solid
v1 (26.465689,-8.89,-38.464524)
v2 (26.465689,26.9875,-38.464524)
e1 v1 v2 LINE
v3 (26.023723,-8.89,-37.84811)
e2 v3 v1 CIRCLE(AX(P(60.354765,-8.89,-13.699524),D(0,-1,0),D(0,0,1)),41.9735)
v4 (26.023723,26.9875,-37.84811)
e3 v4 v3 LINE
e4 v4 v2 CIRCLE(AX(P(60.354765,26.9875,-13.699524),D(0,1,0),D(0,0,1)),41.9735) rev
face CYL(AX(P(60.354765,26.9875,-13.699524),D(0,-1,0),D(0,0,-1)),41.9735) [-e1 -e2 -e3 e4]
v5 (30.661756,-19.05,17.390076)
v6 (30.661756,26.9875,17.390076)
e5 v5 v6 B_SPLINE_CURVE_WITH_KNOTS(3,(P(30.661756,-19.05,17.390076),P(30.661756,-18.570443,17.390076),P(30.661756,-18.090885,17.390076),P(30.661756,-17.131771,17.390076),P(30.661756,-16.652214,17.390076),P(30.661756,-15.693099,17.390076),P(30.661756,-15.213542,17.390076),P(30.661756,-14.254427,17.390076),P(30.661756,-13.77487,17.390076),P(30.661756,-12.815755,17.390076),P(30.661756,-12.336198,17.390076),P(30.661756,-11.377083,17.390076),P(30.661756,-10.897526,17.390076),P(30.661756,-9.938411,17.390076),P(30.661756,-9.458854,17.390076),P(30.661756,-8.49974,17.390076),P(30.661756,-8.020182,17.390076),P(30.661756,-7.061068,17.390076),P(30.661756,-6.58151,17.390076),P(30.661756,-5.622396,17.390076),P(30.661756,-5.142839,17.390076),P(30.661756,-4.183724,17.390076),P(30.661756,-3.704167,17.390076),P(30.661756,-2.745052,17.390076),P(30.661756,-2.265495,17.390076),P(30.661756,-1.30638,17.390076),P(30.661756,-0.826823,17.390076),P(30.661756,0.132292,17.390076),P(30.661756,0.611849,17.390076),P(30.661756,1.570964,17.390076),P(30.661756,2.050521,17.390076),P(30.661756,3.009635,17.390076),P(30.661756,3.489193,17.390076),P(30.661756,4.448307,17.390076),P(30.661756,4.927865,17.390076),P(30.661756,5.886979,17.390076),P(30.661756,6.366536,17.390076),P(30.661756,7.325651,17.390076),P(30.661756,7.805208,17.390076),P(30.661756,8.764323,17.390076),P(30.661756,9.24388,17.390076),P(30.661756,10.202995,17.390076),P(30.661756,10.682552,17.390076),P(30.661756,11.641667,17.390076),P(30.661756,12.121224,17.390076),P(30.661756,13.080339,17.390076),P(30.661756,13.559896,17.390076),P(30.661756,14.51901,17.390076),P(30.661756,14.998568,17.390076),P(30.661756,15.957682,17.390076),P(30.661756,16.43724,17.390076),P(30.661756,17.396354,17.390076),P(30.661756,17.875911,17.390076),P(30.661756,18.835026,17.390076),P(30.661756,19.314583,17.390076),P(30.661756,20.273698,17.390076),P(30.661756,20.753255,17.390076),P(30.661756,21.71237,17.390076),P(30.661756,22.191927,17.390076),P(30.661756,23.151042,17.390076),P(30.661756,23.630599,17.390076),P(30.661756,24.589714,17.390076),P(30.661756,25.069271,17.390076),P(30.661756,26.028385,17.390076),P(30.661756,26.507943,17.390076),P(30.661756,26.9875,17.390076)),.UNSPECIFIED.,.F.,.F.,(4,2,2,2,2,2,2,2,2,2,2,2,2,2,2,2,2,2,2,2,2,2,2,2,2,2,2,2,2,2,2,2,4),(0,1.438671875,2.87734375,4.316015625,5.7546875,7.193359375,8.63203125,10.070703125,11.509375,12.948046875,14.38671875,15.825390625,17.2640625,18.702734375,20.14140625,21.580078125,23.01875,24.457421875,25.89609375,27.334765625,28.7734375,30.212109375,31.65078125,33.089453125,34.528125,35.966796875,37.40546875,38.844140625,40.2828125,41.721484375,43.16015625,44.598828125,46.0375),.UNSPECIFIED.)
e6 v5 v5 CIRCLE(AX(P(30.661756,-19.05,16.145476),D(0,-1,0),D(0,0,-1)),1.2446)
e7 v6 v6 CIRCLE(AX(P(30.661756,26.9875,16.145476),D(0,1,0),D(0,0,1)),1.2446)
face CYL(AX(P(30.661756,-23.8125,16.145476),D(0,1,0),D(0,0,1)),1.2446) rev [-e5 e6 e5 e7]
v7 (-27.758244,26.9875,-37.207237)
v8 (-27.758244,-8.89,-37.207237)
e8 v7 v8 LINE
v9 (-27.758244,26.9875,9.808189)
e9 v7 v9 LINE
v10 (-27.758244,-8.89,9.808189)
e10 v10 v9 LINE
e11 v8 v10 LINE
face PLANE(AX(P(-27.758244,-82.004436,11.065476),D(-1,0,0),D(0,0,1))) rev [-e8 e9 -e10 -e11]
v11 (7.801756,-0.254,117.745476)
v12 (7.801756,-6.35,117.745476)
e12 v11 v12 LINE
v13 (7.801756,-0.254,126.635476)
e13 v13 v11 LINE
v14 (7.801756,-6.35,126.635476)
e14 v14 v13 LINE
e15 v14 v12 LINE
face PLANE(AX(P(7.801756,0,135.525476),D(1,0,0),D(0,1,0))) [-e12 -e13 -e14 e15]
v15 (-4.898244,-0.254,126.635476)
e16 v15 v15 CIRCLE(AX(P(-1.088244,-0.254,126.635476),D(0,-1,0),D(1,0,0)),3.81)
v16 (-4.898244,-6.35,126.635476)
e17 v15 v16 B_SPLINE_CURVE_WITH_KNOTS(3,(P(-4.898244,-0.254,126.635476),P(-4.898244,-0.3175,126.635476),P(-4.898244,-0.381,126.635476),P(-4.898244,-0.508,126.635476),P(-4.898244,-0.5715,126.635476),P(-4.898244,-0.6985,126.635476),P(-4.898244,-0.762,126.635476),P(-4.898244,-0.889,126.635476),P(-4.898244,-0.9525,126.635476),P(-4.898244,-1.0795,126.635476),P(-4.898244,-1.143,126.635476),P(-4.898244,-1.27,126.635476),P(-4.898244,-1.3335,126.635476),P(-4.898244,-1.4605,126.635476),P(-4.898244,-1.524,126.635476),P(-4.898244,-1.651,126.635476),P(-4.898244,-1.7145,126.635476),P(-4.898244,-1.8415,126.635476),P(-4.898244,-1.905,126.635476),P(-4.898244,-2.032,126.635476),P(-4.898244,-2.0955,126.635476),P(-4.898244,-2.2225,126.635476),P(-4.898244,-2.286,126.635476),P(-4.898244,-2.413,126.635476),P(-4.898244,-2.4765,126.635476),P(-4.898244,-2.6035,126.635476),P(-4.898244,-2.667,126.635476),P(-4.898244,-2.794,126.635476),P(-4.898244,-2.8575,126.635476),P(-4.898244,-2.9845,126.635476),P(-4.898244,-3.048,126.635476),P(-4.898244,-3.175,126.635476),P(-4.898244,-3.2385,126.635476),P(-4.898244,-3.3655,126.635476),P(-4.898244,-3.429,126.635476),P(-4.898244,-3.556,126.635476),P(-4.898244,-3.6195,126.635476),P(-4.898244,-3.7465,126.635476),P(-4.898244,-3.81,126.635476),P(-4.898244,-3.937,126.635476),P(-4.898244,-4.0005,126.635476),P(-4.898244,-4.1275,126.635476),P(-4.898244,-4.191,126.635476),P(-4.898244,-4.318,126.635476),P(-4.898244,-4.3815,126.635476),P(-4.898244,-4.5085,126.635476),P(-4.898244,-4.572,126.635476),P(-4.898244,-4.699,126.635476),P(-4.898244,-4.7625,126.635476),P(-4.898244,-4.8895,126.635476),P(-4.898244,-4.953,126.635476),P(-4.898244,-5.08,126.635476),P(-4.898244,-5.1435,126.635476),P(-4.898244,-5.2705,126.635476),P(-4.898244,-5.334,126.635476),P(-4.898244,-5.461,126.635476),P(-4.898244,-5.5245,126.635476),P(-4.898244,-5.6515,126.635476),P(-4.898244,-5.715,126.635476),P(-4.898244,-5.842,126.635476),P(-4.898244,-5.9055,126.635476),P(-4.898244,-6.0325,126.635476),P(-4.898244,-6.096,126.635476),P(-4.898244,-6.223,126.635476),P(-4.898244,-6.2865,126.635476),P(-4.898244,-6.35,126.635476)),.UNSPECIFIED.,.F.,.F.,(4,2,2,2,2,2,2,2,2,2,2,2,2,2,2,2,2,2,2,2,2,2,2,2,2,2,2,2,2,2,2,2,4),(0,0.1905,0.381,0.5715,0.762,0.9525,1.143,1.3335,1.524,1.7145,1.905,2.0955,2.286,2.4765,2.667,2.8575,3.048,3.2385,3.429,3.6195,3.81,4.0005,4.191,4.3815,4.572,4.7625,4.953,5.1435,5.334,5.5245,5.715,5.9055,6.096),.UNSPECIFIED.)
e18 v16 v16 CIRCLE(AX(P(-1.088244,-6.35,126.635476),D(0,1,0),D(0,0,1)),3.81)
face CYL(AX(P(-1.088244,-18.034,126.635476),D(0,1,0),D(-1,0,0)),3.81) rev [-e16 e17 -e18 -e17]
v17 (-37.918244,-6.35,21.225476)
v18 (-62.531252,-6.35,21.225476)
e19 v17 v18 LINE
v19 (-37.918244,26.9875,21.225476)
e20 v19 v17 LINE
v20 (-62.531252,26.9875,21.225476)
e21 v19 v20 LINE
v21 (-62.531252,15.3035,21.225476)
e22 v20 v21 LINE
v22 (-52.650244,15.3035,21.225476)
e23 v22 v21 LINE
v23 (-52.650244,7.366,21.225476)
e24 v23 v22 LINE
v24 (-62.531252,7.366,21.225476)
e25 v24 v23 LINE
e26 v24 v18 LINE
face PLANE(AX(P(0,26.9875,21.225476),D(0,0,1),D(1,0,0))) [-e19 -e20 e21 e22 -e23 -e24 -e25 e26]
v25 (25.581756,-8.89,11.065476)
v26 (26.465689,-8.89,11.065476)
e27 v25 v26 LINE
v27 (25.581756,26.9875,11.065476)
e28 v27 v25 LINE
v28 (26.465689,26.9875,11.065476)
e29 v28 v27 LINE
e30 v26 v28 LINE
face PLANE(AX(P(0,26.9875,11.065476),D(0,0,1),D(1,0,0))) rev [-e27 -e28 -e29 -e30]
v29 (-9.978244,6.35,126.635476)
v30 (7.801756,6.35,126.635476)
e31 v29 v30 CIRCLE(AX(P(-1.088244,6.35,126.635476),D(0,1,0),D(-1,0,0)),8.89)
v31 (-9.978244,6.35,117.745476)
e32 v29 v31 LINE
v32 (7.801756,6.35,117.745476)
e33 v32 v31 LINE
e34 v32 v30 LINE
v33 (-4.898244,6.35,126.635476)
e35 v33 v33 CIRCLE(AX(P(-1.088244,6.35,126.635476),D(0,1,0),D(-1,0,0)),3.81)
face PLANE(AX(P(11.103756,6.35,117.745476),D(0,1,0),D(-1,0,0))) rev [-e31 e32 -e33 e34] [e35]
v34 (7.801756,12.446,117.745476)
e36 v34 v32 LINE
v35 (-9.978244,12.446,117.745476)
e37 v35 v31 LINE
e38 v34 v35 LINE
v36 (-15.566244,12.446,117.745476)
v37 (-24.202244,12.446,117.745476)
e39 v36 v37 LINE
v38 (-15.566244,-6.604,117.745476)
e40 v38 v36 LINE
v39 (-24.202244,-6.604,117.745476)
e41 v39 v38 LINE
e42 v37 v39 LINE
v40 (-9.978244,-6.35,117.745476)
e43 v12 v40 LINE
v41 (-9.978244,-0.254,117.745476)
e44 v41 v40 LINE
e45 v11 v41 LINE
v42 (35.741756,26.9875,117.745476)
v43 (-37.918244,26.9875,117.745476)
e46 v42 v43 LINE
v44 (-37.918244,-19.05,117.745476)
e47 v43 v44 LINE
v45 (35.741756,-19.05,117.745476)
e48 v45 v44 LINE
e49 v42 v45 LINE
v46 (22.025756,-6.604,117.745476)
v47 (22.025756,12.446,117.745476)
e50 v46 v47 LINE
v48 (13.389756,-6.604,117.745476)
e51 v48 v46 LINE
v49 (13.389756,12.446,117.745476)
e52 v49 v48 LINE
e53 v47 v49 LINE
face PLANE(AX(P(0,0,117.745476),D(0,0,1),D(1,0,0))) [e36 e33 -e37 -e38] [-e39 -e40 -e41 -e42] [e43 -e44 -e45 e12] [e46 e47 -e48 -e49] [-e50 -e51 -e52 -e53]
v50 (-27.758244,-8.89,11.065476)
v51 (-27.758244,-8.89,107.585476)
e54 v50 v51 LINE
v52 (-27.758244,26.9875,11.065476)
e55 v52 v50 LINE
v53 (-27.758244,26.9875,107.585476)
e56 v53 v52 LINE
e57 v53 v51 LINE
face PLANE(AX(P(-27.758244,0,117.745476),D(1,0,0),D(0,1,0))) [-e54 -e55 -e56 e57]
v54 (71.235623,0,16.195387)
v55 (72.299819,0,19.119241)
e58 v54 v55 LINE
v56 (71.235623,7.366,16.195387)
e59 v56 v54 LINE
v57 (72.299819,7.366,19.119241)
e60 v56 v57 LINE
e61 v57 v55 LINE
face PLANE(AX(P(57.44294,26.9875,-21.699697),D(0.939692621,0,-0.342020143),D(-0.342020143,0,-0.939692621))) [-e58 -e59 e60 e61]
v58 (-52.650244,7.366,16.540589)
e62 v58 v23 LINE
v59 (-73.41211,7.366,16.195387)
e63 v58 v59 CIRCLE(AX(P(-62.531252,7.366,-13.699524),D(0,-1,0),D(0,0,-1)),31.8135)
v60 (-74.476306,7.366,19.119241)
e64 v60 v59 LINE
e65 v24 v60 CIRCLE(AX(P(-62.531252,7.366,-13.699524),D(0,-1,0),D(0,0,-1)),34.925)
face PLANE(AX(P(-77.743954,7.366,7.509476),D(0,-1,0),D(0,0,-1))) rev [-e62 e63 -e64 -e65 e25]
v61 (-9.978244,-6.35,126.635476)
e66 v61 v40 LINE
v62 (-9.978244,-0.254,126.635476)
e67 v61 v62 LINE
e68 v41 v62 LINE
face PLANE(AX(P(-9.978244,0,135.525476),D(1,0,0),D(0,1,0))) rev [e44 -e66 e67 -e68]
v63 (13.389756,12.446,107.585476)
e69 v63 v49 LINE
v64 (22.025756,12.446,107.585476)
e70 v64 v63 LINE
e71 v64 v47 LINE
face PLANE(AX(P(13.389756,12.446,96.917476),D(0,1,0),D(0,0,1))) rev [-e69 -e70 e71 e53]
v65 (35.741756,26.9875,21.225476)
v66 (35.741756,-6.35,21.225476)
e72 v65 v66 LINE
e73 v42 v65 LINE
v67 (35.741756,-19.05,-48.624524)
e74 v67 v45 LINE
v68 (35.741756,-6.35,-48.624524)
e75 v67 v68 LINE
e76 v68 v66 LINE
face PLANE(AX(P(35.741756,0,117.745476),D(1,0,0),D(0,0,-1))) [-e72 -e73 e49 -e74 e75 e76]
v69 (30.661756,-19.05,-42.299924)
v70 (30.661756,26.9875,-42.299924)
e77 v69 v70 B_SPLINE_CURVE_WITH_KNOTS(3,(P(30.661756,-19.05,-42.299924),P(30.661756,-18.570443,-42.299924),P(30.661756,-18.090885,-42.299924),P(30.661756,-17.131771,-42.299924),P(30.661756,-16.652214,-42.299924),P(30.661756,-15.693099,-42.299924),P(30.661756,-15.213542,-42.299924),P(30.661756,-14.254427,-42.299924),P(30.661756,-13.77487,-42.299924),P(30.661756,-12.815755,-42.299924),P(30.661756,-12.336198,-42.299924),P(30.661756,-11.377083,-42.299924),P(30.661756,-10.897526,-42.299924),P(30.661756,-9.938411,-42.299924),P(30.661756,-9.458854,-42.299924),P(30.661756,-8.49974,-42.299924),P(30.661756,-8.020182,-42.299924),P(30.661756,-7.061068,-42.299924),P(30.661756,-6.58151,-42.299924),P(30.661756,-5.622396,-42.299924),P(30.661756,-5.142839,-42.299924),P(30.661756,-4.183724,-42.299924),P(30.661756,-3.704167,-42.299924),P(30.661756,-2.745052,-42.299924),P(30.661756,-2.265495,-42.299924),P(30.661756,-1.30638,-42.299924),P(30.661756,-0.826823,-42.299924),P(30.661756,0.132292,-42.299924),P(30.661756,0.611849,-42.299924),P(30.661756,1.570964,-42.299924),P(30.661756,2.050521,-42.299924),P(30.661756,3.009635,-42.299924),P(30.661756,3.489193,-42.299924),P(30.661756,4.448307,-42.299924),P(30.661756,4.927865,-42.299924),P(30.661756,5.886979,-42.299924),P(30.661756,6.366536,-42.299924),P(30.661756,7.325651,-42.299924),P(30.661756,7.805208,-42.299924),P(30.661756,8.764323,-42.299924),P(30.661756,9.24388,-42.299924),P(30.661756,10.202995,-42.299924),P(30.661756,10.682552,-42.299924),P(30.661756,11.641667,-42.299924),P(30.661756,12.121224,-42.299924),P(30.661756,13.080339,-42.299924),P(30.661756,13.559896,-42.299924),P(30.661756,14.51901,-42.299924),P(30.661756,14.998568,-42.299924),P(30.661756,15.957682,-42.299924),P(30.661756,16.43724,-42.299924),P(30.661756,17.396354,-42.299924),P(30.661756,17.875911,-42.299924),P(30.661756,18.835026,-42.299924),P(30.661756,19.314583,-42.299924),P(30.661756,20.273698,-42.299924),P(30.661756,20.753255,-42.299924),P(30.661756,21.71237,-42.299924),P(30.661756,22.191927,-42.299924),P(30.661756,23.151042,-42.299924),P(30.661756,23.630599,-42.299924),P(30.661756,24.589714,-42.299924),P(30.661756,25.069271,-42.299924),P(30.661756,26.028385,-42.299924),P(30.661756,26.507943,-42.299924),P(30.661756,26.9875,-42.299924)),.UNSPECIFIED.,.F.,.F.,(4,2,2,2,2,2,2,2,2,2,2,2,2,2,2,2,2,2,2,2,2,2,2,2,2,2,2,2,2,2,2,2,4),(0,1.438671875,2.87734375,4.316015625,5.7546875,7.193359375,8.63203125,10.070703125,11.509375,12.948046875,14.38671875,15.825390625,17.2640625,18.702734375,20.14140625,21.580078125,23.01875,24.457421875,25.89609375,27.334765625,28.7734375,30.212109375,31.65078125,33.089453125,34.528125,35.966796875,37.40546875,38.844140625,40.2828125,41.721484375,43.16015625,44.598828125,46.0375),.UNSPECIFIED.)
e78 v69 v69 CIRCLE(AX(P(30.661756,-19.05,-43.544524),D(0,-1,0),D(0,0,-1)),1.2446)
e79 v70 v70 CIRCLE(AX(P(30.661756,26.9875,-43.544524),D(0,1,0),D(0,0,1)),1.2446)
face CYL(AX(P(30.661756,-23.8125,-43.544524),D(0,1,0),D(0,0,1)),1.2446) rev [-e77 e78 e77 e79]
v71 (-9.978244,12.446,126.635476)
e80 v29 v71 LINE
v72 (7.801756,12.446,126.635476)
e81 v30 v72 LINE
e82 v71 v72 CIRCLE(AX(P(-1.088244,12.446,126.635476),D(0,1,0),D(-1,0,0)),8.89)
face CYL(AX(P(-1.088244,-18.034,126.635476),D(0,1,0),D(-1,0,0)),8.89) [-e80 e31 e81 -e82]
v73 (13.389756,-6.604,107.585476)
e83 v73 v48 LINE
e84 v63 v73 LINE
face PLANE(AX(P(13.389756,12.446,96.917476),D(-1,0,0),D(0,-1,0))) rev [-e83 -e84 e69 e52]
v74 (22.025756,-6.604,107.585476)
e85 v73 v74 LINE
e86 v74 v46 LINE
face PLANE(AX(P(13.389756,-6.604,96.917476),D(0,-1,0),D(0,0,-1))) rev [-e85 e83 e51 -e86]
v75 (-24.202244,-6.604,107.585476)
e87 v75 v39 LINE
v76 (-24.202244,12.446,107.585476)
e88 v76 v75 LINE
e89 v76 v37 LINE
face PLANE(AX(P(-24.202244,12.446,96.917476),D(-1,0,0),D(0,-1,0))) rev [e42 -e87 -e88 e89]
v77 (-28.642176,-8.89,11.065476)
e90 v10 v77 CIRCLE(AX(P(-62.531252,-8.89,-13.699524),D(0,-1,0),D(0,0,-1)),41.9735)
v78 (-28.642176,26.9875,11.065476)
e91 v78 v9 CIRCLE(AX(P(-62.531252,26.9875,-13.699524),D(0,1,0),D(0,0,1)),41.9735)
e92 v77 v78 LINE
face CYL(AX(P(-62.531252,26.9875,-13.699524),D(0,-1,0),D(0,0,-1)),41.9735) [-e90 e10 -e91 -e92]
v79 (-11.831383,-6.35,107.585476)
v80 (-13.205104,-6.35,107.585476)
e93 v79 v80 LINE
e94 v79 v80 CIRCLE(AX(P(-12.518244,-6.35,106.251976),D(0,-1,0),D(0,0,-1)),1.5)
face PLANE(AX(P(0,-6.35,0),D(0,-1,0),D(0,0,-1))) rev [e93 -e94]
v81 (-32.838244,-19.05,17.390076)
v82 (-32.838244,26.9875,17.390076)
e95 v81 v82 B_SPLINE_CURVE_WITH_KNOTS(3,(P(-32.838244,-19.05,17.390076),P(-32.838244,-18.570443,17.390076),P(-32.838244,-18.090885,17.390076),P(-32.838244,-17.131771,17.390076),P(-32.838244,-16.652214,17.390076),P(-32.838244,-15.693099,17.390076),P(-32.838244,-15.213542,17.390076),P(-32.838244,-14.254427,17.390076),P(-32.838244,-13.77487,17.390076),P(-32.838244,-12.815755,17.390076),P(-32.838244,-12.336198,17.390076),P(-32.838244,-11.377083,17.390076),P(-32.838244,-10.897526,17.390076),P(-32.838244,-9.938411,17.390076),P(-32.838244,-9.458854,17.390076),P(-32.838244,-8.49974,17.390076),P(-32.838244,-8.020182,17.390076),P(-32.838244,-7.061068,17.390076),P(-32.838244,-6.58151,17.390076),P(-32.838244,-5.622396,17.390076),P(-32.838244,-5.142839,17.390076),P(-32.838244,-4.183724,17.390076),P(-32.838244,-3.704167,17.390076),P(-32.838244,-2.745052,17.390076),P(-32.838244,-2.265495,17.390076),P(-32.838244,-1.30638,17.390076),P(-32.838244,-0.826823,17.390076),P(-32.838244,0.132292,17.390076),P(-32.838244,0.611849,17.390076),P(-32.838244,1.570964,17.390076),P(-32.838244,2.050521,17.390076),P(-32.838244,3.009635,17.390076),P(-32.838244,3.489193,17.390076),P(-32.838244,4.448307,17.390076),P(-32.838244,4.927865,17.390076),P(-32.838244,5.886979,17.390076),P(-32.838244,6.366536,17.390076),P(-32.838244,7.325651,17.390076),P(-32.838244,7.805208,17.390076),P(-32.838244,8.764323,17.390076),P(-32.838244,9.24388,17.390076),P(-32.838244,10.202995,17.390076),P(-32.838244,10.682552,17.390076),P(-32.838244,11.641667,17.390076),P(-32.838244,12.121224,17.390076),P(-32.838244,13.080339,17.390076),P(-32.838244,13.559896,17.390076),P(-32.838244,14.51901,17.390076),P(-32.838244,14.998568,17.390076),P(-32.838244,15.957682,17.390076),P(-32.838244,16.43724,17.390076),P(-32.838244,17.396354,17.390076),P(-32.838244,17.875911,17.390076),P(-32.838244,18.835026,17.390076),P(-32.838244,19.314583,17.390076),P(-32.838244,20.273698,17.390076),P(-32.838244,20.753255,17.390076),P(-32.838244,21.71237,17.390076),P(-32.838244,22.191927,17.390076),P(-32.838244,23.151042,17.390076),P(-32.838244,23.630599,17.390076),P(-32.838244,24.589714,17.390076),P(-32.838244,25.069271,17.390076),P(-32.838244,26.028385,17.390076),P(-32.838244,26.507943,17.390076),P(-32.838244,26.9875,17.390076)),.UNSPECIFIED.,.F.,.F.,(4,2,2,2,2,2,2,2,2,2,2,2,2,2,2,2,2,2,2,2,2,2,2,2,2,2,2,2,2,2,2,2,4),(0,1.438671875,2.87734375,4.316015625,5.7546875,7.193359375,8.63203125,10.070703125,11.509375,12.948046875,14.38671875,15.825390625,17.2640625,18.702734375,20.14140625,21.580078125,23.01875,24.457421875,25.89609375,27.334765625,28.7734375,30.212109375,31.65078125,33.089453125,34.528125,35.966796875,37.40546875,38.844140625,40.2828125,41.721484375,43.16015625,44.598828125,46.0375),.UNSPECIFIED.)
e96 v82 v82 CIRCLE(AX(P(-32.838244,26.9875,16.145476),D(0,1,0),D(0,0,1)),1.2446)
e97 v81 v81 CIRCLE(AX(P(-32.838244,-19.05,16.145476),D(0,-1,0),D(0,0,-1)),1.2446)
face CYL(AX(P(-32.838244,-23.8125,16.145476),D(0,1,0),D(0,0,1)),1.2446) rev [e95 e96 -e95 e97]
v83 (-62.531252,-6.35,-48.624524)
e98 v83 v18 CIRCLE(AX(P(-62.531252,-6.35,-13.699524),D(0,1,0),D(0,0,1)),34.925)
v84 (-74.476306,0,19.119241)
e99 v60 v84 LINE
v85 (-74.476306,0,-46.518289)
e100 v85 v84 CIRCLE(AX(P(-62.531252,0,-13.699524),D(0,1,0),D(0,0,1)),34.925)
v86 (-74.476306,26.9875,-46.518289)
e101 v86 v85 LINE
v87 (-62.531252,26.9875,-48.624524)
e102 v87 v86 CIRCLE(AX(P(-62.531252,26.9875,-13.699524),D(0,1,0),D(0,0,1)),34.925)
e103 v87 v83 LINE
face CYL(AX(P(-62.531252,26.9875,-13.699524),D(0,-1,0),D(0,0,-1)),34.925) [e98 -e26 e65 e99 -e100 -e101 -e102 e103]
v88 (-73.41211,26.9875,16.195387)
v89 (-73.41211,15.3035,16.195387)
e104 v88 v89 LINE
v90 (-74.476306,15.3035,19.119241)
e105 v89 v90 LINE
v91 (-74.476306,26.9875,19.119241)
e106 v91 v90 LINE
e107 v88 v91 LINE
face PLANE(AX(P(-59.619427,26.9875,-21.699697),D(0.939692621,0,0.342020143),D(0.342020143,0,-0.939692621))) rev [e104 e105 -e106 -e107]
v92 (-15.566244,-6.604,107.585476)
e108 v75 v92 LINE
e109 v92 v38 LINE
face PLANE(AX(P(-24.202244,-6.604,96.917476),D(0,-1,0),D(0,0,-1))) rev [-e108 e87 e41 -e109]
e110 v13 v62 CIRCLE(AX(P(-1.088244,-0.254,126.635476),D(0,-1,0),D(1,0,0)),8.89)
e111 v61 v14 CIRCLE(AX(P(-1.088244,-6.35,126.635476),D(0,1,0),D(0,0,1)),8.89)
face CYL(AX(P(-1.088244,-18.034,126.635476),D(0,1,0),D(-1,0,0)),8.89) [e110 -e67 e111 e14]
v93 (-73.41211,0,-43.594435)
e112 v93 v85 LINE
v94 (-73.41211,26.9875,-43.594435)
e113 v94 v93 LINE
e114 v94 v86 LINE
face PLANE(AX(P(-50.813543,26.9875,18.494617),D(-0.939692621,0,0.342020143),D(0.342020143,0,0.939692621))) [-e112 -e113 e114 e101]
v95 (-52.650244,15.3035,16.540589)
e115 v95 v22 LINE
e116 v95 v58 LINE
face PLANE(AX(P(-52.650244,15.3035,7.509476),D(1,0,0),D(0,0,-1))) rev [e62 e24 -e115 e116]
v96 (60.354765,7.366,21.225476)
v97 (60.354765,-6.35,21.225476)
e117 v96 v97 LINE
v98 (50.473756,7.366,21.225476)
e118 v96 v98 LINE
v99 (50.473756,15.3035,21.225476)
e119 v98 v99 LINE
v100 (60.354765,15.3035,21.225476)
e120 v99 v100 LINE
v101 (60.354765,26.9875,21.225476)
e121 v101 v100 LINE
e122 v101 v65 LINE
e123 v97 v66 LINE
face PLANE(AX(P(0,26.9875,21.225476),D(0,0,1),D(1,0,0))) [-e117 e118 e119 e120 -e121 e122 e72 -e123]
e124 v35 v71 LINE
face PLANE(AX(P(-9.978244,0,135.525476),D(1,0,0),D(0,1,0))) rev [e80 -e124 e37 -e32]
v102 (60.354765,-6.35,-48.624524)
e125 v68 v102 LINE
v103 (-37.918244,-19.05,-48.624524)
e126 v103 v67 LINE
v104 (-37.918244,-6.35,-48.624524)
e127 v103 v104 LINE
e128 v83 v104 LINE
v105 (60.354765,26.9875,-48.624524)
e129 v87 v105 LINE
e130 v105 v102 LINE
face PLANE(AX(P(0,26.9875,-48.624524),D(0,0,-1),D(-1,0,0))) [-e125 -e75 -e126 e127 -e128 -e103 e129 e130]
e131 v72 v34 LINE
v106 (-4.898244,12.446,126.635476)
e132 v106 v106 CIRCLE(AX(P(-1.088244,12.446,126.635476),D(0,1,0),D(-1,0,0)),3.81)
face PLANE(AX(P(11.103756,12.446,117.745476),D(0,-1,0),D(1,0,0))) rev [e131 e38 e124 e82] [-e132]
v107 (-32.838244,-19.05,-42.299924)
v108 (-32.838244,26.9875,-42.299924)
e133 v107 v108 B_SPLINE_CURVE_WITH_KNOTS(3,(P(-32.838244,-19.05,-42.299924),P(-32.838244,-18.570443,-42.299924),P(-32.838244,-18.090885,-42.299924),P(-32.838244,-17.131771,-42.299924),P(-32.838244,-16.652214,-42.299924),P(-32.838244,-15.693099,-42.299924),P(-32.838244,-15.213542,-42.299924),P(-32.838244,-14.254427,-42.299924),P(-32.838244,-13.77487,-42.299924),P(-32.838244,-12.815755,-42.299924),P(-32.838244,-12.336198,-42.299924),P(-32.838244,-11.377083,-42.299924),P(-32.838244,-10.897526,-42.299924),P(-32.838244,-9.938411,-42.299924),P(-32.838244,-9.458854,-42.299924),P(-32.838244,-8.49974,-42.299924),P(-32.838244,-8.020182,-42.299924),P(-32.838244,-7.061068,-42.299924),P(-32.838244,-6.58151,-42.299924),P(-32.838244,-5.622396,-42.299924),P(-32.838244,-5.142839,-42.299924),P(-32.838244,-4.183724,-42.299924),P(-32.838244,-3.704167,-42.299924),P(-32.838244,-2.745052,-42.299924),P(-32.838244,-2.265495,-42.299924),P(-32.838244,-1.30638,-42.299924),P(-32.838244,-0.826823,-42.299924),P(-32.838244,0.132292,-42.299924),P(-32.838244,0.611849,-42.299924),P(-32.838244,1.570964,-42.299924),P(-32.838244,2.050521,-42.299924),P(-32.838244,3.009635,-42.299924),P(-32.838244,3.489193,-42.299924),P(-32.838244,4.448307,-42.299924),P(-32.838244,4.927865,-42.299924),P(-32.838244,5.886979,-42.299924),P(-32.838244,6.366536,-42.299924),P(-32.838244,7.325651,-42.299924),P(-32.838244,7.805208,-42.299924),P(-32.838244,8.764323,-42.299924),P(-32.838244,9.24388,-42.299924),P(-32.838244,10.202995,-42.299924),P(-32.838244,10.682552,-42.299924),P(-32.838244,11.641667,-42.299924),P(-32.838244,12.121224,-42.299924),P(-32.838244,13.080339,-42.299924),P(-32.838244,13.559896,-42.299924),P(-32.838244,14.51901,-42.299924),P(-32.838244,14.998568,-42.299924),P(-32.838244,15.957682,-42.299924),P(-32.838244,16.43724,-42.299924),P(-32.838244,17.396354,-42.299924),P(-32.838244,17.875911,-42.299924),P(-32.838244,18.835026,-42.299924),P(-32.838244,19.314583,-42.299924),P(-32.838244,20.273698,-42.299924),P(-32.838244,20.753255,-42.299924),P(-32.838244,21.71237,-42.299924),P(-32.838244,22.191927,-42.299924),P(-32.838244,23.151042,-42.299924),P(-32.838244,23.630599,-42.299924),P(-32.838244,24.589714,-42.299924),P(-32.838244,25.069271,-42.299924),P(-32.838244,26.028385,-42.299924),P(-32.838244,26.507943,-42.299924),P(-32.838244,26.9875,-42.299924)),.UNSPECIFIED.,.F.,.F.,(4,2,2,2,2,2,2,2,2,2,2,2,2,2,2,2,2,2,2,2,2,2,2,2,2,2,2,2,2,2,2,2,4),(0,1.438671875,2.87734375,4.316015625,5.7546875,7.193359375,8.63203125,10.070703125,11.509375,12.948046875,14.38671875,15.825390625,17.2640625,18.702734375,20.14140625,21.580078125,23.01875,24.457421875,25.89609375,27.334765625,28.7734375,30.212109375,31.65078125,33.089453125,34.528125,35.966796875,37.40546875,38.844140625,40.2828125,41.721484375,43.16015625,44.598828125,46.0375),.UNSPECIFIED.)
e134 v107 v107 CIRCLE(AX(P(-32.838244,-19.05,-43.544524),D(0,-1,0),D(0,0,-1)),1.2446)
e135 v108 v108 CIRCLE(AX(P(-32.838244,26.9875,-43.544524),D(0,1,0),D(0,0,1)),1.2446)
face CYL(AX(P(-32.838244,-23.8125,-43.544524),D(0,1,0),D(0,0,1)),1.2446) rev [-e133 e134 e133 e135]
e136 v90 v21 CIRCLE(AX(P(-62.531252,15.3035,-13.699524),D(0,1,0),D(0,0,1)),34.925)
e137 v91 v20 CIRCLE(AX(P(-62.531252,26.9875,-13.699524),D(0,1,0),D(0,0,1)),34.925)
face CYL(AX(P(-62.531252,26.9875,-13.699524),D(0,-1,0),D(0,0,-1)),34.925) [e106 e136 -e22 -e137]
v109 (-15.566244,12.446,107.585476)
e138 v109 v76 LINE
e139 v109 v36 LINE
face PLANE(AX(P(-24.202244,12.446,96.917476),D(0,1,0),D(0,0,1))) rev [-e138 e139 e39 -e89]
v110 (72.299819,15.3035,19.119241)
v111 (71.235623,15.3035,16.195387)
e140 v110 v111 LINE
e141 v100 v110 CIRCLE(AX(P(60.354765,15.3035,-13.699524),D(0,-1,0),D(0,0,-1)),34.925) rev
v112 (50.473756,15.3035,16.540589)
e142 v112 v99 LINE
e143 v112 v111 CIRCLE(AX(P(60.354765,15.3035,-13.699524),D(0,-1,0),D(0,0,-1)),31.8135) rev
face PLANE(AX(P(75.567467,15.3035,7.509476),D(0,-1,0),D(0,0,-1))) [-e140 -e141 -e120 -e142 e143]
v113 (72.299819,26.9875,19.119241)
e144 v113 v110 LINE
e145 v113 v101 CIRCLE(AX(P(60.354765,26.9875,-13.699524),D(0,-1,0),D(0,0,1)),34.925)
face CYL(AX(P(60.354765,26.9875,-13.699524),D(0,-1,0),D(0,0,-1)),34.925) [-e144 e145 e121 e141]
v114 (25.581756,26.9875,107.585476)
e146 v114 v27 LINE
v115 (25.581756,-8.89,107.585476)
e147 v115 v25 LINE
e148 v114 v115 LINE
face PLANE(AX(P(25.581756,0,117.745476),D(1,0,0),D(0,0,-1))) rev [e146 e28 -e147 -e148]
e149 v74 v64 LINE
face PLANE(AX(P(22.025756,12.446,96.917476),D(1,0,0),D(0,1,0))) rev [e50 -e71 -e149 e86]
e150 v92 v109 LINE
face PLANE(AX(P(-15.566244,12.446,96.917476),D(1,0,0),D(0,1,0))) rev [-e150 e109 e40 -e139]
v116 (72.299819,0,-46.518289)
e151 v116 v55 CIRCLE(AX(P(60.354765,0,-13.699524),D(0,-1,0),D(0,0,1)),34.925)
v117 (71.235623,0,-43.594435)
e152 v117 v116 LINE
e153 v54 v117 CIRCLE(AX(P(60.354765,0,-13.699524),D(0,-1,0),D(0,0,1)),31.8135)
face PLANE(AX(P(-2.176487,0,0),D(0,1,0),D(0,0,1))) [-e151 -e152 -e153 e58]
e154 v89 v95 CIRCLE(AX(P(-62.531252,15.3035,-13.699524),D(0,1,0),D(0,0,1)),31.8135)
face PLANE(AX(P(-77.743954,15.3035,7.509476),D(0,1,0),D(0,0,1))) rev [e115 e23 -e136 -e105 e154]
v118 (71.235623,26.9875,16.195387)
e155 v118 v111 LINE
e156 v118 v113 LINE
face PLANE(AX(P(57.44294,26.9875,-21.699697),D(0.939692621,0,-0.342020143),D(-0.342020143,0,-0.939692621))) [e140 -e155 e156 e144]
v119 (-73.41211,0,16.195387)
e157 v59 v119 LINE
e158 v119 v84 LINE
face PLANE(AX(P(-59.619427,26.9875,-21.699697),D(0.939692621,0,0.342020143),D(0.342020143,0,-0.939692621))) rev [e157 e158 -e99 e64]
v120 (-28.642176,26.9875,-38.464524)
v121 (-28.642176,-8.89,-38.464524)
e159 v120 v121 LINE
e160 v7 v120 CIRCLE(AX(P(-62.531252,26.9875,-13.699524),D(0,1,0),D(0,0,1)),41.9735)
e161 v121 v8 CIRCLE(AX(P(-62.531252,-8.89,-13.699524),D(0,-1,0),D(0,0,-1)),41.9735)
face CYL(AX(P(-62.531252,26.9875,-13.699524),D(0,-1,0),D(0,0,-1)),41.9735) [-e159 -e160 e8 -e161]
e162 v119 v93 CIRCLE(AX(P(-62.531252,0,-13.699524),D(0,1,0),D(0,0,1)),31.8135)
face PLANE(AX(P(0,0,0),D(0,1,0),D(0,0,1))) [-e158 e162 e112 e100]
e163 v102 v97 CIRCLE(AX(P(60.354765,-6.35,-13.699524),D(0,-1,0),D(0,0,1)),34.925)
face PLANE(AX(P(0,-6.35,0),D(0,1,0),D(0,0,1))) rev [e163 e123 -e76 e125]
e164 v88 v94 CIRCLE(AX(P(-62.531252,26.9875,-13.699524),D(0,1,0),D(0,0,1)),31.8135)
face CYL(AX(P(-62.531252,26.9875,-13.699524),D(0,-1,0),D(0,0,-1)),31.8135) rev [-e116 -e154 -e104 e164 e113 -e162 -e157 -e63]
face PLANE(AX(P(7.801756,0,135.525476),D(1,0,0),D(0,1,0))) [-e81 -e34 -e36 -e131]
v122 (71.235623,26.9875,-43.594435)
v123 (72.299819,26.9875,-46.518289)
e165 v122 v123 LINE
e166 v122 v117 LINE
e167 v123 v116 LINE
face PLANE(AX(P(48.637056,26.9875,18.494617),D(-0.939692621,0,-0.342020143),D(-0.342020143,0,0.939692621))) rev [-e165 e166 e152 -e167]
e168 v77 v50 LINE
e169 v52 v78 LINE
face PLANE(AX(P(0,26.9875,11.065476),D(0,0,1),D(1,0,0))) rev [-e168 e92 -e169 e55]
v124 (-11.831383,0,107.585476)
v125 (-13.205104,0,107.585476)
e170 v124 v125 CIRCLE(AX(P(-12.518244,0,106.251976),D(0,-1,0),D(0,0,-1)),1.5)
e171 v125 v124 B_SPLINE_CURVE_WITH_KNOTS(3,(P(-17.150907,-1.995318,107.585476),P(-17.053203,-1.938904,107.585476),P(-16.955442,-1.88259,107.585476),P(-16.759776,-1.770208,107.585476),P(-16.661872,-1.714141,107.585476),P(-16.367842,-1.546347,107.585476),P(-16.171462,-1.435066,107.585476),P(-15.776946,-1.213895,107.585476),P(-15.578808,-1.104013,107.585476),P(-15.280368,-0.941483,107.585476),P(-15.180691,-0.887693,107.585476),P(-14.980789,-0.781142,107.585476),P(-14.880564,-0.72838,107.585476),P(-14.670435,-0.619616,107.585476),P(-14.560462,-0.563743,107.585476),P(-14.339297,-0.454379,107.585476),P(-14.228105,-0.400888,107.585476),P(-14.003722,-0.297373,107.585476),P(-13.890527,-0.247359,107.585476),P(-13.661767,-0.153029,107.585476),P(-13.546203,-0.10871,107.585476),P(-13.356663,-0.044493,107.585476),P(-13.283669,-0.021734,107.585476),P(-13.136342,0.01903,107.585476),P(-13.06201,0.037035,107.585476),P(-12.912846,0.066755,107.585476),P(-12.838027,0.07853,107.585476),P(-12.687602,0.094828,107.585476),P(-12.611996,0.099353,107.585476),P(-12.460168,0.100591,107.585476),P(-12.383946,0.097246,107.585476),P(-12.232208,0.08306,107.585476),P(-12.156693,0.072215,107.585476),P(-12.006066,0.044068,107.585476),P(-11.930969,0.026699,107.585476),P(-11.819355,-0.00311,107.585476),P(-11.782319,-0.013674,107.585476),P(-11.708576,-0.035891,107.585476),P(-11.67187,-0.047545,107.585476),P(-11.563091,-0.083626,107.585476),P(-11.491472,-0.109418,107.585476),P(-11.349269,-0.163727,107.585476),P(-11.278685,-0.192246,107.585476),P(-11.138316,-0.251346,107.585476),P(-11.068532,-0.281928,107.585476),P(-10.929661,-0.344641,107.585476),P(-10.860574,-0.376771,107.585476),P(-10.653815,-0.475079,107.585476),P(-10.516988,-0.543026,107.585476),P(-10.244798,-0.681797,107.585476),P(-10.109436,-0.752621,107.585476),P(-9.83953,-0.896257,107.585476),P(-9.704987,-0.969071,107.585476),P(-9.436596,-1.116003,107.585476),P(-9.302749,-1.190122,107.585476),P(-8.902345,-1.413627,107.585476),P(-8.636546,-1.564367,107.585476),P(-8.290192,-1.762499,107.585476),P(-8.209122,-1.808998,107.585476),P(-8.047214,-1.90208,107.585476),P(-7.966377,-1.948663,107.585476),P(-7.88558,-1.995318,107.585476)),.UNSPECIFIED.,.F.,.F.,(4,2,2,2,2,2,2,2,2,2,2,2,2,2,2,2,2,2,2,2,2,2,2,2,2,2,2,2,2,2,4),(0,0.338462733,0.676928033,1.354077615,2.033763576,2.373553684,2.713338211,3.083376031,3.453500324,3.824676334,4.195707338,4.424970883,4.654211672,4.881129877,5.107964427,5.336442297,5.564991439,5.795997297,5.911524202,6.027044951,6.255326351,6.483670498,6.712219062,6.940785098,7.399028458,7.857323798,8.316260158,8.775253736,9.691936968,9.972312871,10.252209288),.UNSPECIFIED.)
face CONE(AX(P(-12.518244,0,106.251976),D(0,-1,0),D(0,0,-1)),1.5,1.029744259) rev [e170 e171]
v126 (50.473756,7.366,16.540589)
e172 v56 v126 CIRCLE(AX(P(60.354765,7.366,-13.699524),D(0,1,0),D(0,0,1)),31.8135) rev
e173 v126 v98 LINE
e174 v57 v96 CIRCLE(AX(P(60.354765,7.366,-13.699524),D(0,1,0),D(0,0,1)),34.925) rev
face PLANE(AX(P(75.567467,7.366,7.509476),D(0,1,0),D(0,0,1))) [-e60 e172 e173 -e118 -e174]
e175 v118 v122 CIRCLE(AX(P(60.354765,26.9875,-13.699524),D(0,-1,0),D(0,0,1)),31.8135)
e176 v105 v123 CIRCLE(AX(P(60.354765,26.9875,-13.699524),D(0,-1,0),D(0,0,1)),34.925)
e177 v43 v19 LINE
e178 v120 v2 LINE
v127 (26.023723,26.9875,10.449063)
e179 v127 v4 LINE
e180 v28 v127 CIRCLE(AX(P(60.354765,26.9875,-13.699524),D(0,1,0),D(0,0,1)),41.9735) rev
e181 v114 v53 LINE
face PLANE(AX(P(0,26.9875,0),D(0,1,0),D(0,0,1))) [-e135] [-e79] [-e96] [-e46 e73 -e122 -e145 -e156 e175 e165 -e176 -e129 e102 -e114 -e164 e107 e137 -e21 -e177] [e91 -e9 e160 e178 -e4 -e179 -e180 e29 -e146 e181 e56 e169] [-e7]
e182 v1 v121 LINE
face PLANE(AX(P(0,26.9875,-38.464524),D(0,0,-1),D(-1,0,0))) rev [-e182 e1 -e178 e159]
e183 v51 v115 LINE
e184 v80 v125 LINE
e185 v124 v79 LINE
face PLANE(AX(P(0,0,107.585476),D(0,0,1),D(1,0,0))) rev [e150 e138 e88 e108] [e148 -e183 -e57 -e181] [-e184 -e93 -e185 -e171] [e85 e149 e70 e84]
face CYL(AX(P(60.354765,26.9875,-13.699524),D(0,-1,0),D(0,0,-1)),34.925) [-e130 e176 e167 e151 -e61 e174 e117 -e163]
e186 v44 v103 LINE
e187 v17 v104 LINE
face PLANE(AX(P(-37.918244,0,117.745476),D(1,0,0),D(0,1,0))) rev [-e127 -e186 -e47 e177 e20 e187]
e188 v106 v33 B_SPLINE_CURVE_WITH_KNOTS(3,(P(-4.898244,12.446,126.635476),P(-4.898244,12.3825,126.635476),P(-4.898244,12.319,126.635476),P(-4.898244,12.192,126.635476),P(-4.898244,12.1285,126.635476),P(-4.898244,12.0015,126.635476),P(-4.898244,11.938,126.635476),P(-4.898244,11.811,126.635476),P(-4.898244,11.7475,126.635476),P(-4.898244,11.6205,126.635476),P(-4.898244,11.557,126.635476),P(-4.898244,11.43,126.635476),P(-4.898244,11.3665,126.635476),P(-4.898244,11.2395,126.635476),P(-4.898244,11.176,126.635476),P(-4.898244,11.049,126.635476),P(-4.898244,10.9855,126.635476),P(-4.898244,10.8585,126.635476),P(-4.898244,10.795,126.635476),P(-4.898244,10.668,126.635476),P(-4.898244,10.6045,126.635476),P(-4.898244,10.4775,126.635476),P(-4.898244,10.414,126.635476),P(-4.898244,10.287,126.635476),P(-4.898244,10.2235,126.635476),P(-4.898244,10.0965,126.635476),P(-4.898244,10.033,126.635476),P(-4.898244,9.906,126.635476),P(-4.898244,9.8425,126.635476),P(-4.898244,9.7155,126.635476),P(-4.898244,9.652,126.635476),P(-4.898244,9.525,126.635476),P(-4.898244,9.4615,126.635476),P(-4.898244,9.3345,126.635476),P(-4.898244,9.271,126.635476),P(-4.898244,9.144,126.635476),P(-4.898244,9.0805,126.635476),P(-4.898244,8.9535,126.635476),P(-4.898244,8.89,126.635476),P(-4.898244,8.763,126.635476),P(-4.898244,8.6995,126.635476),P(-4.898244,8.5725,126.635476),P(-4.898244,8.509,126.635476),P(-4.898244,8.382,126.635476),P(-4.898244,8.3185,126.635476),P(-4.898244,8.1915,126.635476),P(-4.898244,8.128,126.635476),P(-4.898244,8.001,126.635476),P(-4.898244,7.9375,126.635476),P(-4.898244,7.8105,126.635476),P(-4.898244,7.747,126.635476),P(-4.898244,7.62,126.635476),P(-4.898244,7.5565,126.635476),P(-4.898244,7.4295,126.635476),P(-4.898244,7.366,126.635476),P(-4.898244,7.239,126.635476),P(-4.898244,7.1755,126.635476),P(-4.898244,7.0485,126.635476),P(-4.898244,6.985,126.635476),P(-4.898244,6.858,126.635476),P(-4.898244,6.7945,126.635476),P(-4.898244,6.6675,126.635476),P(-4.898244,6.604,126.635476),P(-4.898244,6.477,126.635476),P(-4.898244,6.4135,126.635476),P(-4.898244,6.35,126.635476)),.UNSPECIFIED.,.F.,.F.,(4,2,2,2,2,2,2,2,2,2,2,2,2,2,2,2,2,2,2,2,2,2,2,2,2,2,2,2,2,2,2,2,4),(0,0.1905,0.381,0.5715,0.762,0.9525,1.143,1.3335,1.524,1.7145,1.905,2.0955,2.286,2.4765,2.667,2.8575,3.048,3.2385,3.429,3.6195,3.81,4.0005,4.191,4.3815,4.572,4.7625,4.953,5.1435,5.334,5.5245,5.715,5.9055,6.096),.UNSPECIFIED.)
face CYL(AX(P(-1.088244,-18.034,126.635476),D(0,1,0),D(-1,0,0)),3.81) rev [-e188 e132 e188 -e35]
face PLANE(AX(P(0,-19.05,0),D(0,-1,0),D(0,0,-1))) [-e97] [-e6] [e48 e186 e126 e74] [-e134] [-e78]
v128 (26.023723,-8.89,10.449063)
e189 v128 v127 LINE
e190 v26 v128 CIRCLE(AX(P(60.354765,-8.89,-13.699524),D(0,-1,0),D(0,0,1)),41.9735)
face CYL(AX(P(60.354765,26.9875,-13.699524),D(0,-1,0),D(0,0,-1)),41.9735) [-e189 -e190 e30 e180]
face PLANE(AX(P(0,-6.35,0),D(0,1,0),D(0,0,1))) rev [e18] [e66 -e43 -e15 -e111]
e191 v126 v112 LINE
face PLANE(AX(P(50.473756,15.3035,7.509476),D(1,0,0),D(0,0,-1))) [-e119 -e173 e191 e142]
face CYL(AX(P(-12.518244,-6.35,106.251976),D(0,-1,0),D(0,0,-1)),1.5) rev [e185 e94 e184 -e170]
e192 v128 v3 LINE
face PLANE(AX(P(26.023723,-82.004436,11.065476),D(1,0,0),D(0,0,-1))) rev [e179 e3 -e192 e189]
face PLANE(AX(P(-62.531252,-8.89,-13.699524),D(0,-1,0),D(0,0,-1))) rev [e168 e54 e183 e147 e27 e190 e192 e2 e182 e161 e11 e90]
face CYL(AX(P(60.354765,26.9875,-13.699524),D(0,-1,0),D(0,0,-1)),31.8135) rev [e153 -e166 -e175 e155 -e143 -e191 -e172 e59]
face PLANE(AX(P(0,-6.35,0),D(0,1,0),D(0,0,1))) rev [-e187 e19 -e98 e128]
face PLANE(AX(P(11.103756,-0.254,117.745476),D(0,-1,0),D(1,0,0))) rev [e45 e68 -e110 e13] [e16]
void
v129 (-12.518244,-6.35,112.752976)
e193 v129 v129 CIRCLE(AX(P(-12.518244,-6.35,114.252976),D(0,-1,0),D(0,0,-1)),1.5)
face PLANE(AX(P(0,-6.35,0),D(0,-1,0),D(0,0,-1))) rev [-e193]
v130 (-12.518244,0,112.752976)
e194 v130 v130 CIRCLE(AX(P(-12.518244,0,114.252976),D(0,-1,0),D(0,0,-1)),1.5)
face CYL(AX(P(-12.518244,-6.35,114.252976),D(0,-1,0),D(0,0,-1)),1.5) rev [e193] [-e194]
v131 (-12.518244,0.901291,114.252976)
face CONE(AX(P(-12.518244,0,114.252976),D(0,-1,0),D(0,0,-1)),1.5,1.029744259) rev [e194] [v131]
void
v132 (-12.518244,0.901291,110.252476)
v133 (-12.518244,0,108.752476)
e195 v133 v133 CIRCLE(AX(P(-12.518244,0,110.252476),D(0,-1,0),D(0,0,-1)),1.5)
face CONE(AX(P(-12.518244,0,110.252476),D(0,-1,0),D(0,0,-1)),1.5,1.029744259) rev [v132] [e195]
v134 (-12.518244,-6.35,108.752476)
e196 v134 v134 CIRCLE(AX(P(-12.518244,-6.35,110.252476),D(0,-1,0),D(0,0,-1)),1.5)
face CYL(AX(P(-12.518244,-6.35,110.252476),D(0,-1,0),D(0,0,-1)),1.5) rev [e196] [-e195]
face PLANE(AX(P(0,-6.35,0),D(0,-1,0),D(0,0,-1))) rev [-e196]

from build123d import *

# Parameters (mm, degrees)
BOSS_EXTRUDE1_DEPTH          = 26.9875
BOSS_EXTRUDE5_START          = -6.35
BOSS_EXTRUDE5_DEPTH          = 6.35
SKETCH3_W                    = 36.83
SKETCH3_H                    = 33.3375
BOSS_EXTRUDE7_DEPTH          = 96.52
SKETCH6_W                    = 8.89
SKETCH6_H                    = 33.3375
BOSS_EXTRUDE8_DEPTH          = 17.78
SKETCH7_W                    = 17.78
SKETCH7_H                    = 14.5415
SKETCH7_H_2                  = 6.604
CUT_EXTRUDE1_DEPTH           = 21.082
CUT_EXTRUDE2_DEPTH           = 30.48
F_3_0_3_DIAMETER_HOLE1_D     = 3
F_3_0_3_DIAMETER_HOLE1_DEPTH = 6.35
F_3_0_3_DIAMETER_HOLE1_TIP   = 0.901290929
SKETCH11_W                   = 25.093710248
SKETCH11_H                   = 7.9375
CUT_EXTRUDE3_DEPTH           = 13.716
SHELL1_START                 = -38.464523808
SHELL1_OUTLINE_W             = 53.34
SHELL1_OUTLINE_H             = 23.1775
SHELL1_DEPTH                 = 146.05
SHELL1_START_2               = 3.81
SHELL1_3_DEPTH               = 23.1775
SHELL1_4_DEPTH               = 23.1775
SKETCH14_W                   = 53.34
SKETCH14_H                   = 23.1775
CUT_EXTRUDE5_DEPTH           = 18.288
SKETCH16_W                   = 73.66
SKETCH16_H                   = 166.37
BOSS_EXTRUDE9_DEPTH          = 12.7
CUT_EXTRUDE6_START           = -12.7
CUT_EXTRUDE6_DEPTH           = 12.7
SKETCH18_W                   = 8.636
SKETCH18_H                   = 19.05
CUT_EXTRUDE7_DEPTH           = 20.828
SKETCH13_R                   = 1.2446
CUT_EXTRUDE4_DEPTH           = 50.8
SKETCH20_W                   = 53.781966305
SKETCH20_H                   = 49.53
CUT_EXTRUDE8_DEPTH           = 35.8775


with BuildPart() as part:
    # Sketch1 → Boss-Extrude1 (new body)
    with BuildSketch(Plane(origin=(0, 0, 0), x_dir=(1, 0, 0), z_dir=(0, 1, 0))):
        with BuildLine():
            ThreePointArc((-27.606252307, 13.699523808), (-37.835547974, 38.395228141), (-62.531252307, 48.624523808))
            Line((-62.531252307, 48.624523808), (-62.531252307, 45.513023808))
            ThreePointArc((-62.531252307, 45.513023808), (-40.035710723, 36.195065391), (-30.717752307, 13.699523808))
            ThreePointArc((-30.717752307, 13.699523808), (-40.035710723, -8.796017775), (-62.531252307, -18.113976192))
            Line((-62.531252307, -18.113976192), (-62.531252307, -21.225476192))
            ThreePointArc((-62.531252307, -21.225476192), (-37.835547974, -10.996180525), (-27.606252307, 13.699523808))
        make_face()
        with BuildLine():
            Line((-62.531252307, 45.513023808), (-62.531252307, 48.624523808))
            ThreePointArc((-62.531252307, 48.624523808), (-68.595914912, 48.093934582), (-74.476305812, 46.518288589))
            Line((-74.476305812, 46.518288589), (-73.412110136, 43.594434999))
            ThreePointArc((-73.412110136, 43.594434999), (-68.055608607, 45.029705258), (-62.531252307, 45.513023808))
        make_face()
        with BuildLine():
            ThreePointArc((-74.476305812, -19.119240973), (-68.595914912, -20.694886966), (-62.531252307, -21.225476192))
            Line((-62.531252307, -21.225476192), (-62.531252307, -18.113976192))
            ThreePointArc((-62.531252307, -18.113976192), (-68.055608607, -17.630657643), (-73.412110136, -16.195387383))
            Line((-73.412110136, -16.195387383), (-74.476305812, -19.119240973))
        make_face()
        with BuildLine():
            Line((-1.088243621, 48.624523808), (-62.531252307, 48.624523808))
            ThreePointArc((-62.531252307, 48.624523808), (-37.835547974, 38.395228141), (-27.606252307, 13.699523808))
            ThreePointArc((-27.606252307, 13.699523808), (-37.835547974, -10.996180525), (-62.531252307, -21.225476192))
            Line((-62.531252307, -21.225476192), (-1.088243621, -21.225476192))
            Line((-1.088243621, -21.225476192), (-1.088243621, 48.624523808))
        make_face()
    boss_extrude1 = extrude(amount=BOSS_EXTRUDE1_DEPTH)

    # Sketch1<5> → Boss-Extrude5 (add)
    with BuildSketch(Plane(origin=(0, 0, 0), x_dir=(1, 0, 0), z_dir=(0, 1, 0)).offset(BOSS_EXTRUDE5_START)):
        with BuildLine():
            Line((-62.531252307, -21.225476192), (-1.088243621, -21.225476192))
            Line((-1.088243621, -21.225476192), (-1.088243621, 48.624523808))
            Line((-1.088243621, 48.624523808), (-62.531252307, 48.624523808))
            ThreePointArc((-62.531252307, 48.624523808), (-97.456252307, 13.699523808), (-62.531252307, -21.225476192))
        make_face()
    boss_extrude5 = extrude(amount=BOSS_EXTRUDE5_DEPTH)

    # Mirror1: Boss-Extrude1, Boss-Extrude5 across plane
    add(boss_extrude1.mirror(Plane(origin=(-1.088243621, 26.9875, 0), x_dir=(0, 0, 1), z_dir=(1, 0, 0))))
    add(boss_extrude5.mirror(Plane(origin=(-1.088243621, 26.9875, 0), x_dir=(0, 0, 1), z_dir=(1, 0, 0))))

    # Sketch3 → Boss-Extrude7 (add)
    with BuildSketch(Plane.XY.offset(21.225476192)):
        with Locations((-19.503243621, 10.31875)):
            Rectangle(SKETCH3_W, SKETCH3_H)
        with Locations((17.326756379, 10.31875)):
            Rectangle(SKETCH3_W, SKETCH3_H)
    extrude(amount=BOSS_EXTRUDE7_DEPTH)

    # Sketch6 → Boss-Extrude8 (add)
    with BuildSketch(Plane.XY.offset(117.745476192)):
        with Locations((-5.533243621, 10.31875)):
            Rectangle(SKETCH6_W, SKETCH6_H)
        with Locations((3.356756379, 10.31875)):
            Rectangle(SKETCH6_W, SKETCH6_H)
    extrude(amount=BOSS_EXTRUDE8_DEPTH)

    # Sketch7 → Cut-Extrude1 (cut)
    with BuildSketch(Plane.ZY.offset(9.978243621)):
        with Locations((126.635476192, 19.71675)):
            Rectangle(SKETCH7_W, SKETCH7_H)
        with Locations((126.635476192, 3.048)):
            Rectangle(SKETCH7_W, SKETCH7_H_2)
    extrude(amount=-CUT_EXTRUDE1_DEPTH, mode=Mode.SUBTRACT)

    # Sketch8 → Cut-Extrude2 (cut)
    with BuildSketch(Plane(origin=(0, 12.446, 0), x_dir=(1, 0, 0), z_dir=(0, 1, 0))):
        with BuildLine():
            Line((-9.978243621, -135.525476192), (-1.088243621, -135.525476192))
            ThreePointArc((-1.088243621, -135.525476192), (-7.374422906, -132.921655477), (-9.978243621, -126.635476192))
            Line((-9.978243621, -126.635476192), (-9.978243621, -135.525476192))
        make_face()
        with BuildLine():
            Line((7.801756379, -135.525476192), (7.801756379, -126.635476192))
            ThreePointArc((7.801756379, -126.635476192), (5.197935664, -132.921655477), (-1.088243621, -135.525476192))
            Line((-1.088243621, -135.525476192), (7.801756379, -135.525476192))
        make_face()
        with BuildLine():
            ThreePointArc((-4.898243621, -126.635476192), (-1.088243621, -130.445476192), (2.721756379, -126.635476192))
            Line((2.721756379, -126.635476192), (-4.898243621, -126.635476192))
        make_face()
        with BuildLine():
            Line((-4.898243621, -126.635476192), (2.721756379, -126.635476192))
            ThreePointArc((2.721756379, -126.635476192), (-1.088243621, -122.825476192), (-4.898243621, -126.635476192))
        make_face()
    extrude(amount=-CUT_EXTRUDE2_DEPTH, mode=Mode.SUBTRACT)

    # Ø3.0 (3) Diameter Hole1
    with Locations(Plane(origin=(-12.518243621, -6.35, 114.252976192), x_dir=(0, 0, -1), z_dir=(0, -1, 0))):
        with Locations((0, 0), (4.0005, 0), (8.001, 0)):
            Hole(F_3_0_3_DIAMETER_HOLE1_D / 2, depth=F_3_0_3_DIAMETER_HOLE1_DEPTH)
            with Locations((0, 0, -(F_3_0_3_DIAMETER_HOLE1_DEPTH + F_3_0_3_DIAMETER_HOLE1_TIP / 2))):  # 118° drill point
                Cone(0, F_3_0_3_DIAMETER_HOLE1_D / 2, F_3_0_3_DIAMETER_HOLE1_TIP, mode=Mode.SUBTRACT)

    # Sketch11 → Cut-Extrude3 (cut)
    with BuildSketch(Plane.XY.offset(21.225476192)):
        with Locations((-65.197098745, 11.33475)):
            Rectangle(SKETCH11_W, SKETCH11_H)
    cut_extrude3 = extrude(amount=-CUT_EXTRUDE3_DEPTH, mode=Mode.SUBTRACT)

    # Mirror2: Cut-Extrude3 across plane
    add(cut_extrude3.mirror(Plane.ZY.offset(1.088243621)), mode=Mode.SUBTRACT)

    # Shell1: read off the stored shape, not the designer's step
    # Shell1 outline → Shell1 (cut)
    with BuildSketch(Plane.XY.offset(SHELL1_START)):
        with Locations((-1.088243621, 15.39875)):
            Rectangle(SHELL1_OUTLINE_W, SHELL1_OUTLINE_H)
    extrude(amount=SHELL1_DEPTH, mode=Mode.SUBTRACT)

    # Shell1 2 outline → Shell1 2 (revolve)
    with BuildSketch(Plane(origin=(-12.518243621, 0, 106.251976192), x_dir=(1, 0, 0), z_dir=(0, 0, 1))):
        Polygon((11.66, 3.81), (11.66, 5.748251426), (0, 12.754286244), (0, 3.81), align=None)
    revolve(axis=Axis((-12.518243621, 0, 106.251976192), (0, 1, 0)))

    # Shell1 3 outline → Shell1 3 (cut)
    with BuildSketch(Plane(origin=(0, 0, 0), x_dir=(1, 0, 0), z_dir=(0, 1, 0)).offset(SHELL1_START_2)):
        with BuildLine():
            ThreePointArc((-27.758243621, -9.808189165), (-28.194454791, -10.440878812), (-28.642176231, -11.065476192))
            Line((-28.642176231, -11.065476192), (-27.758243621, -11.065476192))
            Line((-27.758243621, -11.065476192), (-27.758243621, -9.808189165))
        make_face()
        with BuildLine():
            ThreePointArc((26.46568899, -11.065476192), (26.01796755, -10.440878811), (25.581756379, -9.808189163))
            Line((25.581756379, -9.808189163), (25.581756379, -11.065476192))
            Line((25.581756379, -11.065476192), (26.46568899, -11.065476192))
        make_face()
        with BuildLine():
            Line((26.46568899, 38.464523808), (25.581756379, 38.464523808))
            Line((25.581756379, 38.464523808), (25.581756379, 37.207236779))
            ThreePointArc((25.581756379, 37.207236779), (26.01796755, 37.839926427), (26.46568899, 38.464523808))
        make_face()
        with BuildLine():
            ThreePointArc((-28.642176231, 38.464523808), (-28.194454791, 37.839926428), (-27.758243621, 37.207236781))
            Line((-27.758243621, 37.207236781), (-27.758243621, 38.464523808))
            Line((-27.758243621, 38.464523808), (-28.642176231, 38.464523808))
        make_face()
        with BuildLine():
            Line((-10.554813524, -117.745476192), (-14.481673718, -117.745476192))
            ThreePointArc((-14.481673718, -117.745476192), (-12.518243621, -117.911976192), (-10.554813524, -117.745476192))
        make_face()
    extrude(amount=SHELL1_3_DEPTH, mode=Mode.SUBTRACT)

    # Shell1 4 outline → Shell1 4 (add)
    with BuildSketch(Plane(origin=(0, 0, 0), x_dir=(1, 0, 0), z_dir=(0, 1, 0)).offset(SHELL1_START_2)):
        with BuildLine():
            Line((25.581756379, -9.808189163), (25.581756379, 37.207236779))
            ThreePointArc((25.581756379, 37.207236779), (18.381265065, 13.699523808), (25.581756379, -9.808189163))
        make_face()
        with BuildLine():
            Line((-27.758243621, 37.207236781), (-27.758243621, -9.808189165))
            ThreePointArc((-27.758243621, -9.808189165), (-20.557752307, 13.699523808), (-27.758243621, 37.207236781))
        make_face()
    extrude(amount=SHELL1_4_DEPTH)

    # Sketch14 → Cut-Extrude5 (cut)
    with BuildSketch(Plane(origin=(0, 0, 107.585476192), x_dir=(-1, 0, 0), z_dir=(0, 0, -1))):
        with Locations((1.088243621, 15.39875)):
            Rectangle(SKETCH14_W, SKETCH14_H)
    extrude(amount=CUT_EXTRUDE5_DEPTH, mode=Mode.SUBTRACT)

    # Sketch16 → Boss-Extrude9 (add)
    with BuildSketch(Plane.XZ.offset(6.35)):
        with Locations((-1.088243621, 34.560476192)):
            Rectangle(SKETCH16_W, SKETCH16_H)
    extrude(amount=BOSS_EXTRUDE9_DEPTH)

    # Sketch17 → Cut-Extrude6 (cut)
    with BuildSketch(Plane(origin=(0, 3.81, 0), x_dir=(1, 0, 0), z_dir=(0, 1, 0)).offset(CUT_EXTRUDE6_START)):
        with BuildLine():
            Line((-28.642176231, 38.464523808), (26.46568899, 38.464523808))
            ThreePointArc((26.46568899, 38.464523808), (18.381265065, 13.699523808), (26.46568899, -11.065476192))
            Line((26.46568899, -11.065476192), (25.581756379, -11.065476192))
            Line((25.581756379, -11.065476192), (25.581756379, -107.585476192))
            Line((25.581756379, -107.585476192), (-27.758243621, -107.585476192))
            Line((-27.758243621, -107.585476192), (-27.758243621, -11.065476192))
            Line((-27.758243621, -11.065476192), (-28.642176231, -11.065476192))
            ThreePointArc((-28.642176231, -11.065476192), (-20.557752307, 13.699523808), (-28.642176231, 38.464523808))
        make_face()
    extrude(amount=CUT_EXTRUDE6_DEPTH, mode=Mode.SUBTRACT)

    # Sketch18 → Cut-Extrude7 (cut)
    with BuildSketch(Plane.XY.offset(117.745476192)):
        with Locations((-19.884243621, 2.921)):
            Rectangle(SKETCH18_W, SKETCH18_H)
        with Locations((17.707756379, 2.921)):
            Rectangle(SKETCH18_W, SKETCH18_H)
    extrude(amount=-CUT_EXTRUDE7_DEPTH, mode=Mode.SUBTRACT)

    # Sketch13 → Cut-Extrude4 (cut)
    with BuildSketch(Plane(origin=(0, 26.9875, 0), x_dir=(1, 0, 0), z_dir=(0, 1, 0))):
        with Locations(Location((30.661756379, -16.145476192, 0), (0, 0, 270))):
            Circle(SKETCH13_R)
        with Locations(Location((-32.838243621, -16.145476192, 0), (0, 0, 270))):
            Circle(SKETCH13_R)
        with Locations(Location((-32.838243621, 43.544523808, 0), (0, 0, 270))):
            Circle(SKETCH13_R)
        with Locations(Location((30.661756379, 43.544523808, 0), (0, 0, 270))):
            Circle(SKETCH13_R)
    extrude(amount=-CUT_EXTRUDE4_DEPTH, mode=Mode.SUBTRACT)

    # Sketch20 → Cut-Extrude8 (cut)
    with BuildSketch(Plane(origin=(0, 26.9875, 0), x_dir=(1, 0, 0), z_dir=(0, 1, 0))):
        with Locations((-0.867260468, 13.699523808)):
            Rectangle(SKETCH20_W, SKETCH20_H)
    extrude(amount=-CUT_EXTRUDE8_DEPTH, mode=Mode.SUBTRACT)


solid = part.part
